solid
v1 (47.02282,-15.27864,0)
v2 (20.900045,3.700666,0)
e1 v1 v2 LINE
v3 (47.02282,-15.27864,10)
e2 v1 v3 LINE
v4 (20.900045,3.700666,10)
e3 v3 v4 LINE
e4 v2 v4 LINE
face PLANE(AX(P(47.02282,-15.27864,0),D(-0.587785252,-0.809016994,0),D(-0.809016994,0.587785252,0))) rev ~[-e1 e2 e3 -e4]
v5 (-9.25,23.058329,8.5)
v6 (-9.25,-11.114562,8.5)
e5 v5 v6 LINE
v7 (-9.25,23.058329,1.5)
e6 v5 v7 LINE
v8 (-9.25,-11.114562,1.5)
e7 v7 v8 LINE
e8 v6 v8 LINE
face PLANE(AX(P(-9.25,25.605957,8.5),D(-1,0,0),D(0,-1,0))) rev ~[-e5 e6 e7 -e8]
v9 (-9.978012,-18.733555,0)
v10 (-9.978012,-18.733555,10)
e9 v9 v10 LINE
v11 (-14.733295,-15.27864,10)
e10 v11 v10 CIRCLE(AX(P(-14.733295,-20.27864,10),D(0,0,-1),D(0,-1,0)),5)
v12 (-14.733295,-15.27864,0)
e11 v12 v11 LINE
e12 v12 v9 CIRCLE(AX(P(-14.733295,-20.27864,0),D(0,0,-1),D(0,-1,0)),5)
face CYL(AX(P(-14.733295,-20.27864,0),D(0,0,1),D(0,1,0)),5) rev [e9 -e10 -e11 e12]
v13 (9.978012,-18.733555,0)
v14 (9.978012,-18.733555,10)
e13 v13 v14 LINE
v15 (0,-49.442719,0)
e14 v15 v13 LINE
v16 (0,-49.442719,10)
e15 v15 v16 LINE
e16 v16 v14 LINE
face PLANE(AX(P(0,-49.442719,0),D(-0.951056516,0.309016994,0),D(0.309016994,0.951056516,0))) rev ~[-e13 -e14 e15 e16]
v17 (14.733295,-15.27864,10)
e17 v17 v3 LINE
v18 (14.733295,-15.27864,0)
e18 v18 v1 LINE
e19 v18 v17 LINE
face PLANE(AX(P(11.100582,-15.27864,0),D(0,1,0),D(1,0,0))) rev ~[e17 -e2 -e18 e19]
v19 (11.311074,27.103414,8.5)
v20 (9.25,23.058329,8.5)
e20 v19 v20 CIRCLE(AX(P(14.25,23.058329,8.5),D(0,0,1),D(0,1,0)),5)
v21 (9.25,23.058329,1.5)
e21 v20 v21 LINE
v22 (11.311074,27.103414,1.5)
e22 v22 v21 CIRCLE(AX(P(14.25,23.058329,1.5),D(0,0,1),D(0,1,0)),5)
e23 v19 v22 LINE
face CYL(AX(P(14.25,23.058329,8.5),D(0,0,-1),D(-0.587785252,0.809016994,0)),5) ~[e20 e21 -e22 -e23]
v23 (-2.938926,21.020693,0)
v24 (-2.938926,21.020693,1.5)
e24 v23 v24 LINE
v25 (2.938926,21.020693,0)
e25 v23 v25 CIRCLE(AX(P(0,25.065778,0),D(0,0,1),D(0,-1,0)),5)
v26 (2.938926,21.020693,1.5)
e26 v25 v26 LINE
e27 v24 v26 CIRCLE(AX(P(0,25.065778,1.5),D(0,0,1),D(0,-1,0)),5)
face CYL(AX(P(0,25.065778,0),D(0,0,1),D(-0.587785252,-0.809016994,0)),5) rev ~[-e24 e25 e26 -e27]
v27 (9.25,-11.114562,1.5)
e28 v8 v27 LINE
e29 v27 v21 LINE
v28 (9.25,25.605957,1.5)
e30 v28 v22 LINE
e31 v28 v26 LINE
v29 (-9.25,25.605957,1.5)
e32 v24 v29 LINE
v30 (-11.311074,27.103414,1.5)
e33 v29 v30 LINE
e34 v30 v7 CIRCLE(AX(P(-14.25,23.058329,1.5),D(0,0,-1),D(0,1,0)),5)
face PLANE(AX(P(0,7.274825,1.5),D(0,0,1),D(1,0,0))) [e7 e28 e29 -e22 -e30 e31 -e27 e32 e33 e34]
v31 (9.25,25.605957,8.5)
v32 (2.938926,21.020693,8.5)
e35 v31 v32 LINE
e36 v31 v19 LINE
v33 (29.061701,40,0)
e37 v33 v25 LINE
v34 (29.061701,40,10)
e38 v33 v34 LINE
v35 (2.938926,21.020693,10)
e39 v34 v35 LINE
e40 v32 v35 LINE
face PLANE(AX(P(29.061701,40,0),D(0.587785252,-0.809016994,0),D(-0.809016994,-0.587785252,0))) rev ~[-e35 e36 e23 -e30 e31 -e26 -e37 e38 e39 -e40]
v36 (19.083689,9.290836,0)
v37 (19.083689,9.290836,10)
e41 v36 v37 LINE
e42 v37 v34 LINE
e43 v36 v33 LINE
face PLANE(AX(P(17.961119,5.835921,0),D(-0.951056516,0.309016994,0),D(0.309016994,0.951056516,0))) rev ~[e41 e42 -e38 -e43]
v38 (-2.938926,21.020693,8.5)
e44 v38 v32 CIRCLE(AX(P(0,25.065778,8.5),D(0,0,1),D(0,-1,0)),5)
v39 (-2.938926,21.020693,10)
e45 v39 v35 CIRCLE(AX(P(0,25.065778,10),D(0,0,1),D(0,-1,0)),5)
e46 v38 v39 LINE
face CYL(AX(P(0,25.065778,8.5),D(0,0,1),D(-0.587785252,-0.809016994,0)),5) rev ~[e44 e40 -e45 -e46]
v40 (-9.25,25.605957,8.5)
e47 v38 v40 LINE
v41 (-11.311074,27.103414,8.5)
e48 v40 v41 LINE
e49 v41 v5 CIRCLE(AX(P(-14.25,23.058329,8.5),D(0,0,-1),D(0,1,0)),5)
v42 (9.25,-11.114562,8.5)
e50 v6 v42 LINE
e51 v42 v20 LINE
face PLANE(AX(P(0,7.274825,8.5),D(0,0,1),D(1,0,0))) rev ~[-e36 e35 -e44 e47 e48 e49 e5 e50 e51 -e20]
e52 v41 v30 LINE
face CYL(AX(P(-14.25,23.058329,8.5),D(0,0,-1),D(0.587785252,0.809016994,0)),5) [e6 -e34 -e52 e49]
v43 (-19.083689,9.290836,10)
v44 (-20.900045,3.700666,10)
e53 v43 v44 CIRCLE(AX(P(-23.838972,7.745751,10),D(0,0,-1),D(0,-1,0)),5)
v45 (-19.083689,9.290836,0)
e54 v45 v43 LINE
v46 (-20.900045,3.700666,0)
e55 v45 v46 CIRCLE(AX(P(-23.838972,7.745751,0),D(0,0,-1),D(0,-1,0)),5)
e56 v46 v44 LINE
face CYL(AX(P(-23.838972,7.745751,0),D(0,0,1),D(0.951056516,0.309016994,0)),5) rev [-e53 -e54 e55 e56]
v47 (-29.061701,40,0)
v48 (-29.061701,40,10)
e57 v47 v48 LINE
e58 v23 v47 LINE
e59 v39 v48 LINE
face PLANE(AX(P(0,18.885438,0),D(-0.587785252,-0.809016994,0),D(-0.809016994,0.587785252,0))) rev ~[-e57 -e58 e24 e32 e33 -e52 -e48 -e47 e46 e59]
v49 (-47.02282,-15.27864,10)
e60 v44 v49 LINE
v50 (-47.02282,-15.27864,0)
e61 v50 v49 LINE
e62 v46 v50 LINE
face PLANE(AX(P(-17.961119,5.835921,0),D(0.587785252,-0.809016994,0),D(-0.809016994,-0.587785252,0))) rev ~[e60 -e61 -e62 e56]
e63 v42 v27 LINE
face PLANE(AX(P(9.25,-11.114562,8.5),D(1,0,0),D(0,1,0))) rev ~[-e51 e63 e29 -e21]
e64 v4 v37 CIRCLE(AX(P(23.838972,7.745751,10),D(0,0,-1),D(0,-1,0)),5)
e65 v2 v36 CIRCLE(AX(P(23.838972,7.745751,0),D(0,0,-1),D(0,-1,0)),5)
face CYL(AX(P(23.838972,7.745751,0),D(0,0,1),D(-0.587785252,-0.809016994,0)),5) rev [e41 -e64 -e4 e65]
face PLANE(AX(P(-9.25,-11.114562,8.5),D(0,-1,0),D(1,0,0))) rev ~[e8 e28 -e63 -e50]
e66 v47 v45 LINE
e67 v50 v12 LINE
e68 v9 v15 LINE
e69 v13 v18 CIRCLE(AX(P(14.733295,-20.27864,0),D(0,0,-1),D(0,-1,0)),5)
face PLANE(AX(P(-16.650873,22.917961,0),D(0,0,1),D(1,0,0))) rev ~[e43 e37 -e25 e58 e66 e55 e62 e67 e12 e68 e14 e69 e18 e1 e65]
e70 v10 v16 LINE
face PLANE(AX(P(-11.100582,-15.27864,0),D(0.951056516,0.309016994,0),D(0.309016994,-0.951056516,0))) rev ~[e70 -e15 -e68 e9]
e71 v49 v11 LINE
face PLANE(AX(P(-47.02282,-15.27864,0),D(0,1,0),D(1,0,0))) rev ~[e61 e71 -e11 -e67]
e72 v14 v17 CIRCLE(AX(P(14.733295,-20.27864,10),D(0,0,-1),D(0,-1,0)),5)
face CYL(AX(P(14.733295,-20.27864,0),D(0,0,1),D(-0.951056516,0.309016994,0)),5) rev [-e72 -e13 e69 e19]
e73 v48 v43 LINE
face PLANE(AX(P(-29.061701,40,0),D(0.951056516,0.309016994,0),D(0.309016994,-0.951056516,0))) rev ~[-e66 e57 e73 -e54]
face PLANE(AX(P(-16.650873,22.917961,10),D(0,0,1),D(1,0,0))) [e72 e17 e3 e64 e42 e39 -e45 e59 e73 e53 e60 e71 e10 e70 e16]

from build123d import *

# Parameters (mm, degrees)
F1_DEPTH = 10
F3_START = -1.5
F3_DEPTH = 7
F4_R     = 5


with BuildPart() as f1:
    # F0 (on Top) → F1 (new body)
    with BuildSketch(Plane.XY):
        Polygon((0, 18.8854382), (-29.0617011202, 40), (-17.9611190632, 5.83592135), align=None)
        Polygon((17.9611190632, 5.83592135), (29.0617011202, 40), (0, 18.8854382), align=None)
        Polygon((0, 18.8854382), (-17.9611190632, 5.83592135), (-11.100582057, -15.27864045), (11.100582057, -15.27864045), (17.9611190632, 5.83592135), align=None)
        Polygon((11.100582057, -15.27864045), (47.0228201834, -15.27864045), (17.9611190632, 5.83592135), align=None)
        Polygon((-11.100582057, -15.27864045), (0, -49.4427191), (11.100582057, -15.27864045), align=None)
        Polygon((-17.9611190632, 5.83592135), (-47.0228201834, -15.27864045), (-11.100582057, -15.27864045), align=None)
    extrude(amount=F1_DEPTH)

    # F2 (on face) → F3 (cut)
    with BuildSketch(Plane.XY.offset(10).offset(F3_START)):
        Polygon((-9.25, -11.1145618), (0, -11.1145618), (9.25, -11.1145618), (9.25, 25.605956584), (0, 18.8854382), (-9.25, 25.605956584), align=None)
    extrude(amount=-F3_DEPTH, mode=Mode.SUBTRACT)

    # F4
    f4_edges = [f1.edges().sort_by_distance(p)[0] for p in [
        (-17.961119, 5.835921, 5),
        (-11.100582, -15.27864, 5),
        (11.100582, -15.27864, 5),
        (17.961119, 5.835921, 5),
        (0, 18.885438, 9.25),
        (0, 18.885438, 0.75),
        (9.25, 25.605957, 5),
        (-9.25, 25.605957, 5),
    ]]
    fillet(f4_edges, radius=F4_R)


solid = f1.part
